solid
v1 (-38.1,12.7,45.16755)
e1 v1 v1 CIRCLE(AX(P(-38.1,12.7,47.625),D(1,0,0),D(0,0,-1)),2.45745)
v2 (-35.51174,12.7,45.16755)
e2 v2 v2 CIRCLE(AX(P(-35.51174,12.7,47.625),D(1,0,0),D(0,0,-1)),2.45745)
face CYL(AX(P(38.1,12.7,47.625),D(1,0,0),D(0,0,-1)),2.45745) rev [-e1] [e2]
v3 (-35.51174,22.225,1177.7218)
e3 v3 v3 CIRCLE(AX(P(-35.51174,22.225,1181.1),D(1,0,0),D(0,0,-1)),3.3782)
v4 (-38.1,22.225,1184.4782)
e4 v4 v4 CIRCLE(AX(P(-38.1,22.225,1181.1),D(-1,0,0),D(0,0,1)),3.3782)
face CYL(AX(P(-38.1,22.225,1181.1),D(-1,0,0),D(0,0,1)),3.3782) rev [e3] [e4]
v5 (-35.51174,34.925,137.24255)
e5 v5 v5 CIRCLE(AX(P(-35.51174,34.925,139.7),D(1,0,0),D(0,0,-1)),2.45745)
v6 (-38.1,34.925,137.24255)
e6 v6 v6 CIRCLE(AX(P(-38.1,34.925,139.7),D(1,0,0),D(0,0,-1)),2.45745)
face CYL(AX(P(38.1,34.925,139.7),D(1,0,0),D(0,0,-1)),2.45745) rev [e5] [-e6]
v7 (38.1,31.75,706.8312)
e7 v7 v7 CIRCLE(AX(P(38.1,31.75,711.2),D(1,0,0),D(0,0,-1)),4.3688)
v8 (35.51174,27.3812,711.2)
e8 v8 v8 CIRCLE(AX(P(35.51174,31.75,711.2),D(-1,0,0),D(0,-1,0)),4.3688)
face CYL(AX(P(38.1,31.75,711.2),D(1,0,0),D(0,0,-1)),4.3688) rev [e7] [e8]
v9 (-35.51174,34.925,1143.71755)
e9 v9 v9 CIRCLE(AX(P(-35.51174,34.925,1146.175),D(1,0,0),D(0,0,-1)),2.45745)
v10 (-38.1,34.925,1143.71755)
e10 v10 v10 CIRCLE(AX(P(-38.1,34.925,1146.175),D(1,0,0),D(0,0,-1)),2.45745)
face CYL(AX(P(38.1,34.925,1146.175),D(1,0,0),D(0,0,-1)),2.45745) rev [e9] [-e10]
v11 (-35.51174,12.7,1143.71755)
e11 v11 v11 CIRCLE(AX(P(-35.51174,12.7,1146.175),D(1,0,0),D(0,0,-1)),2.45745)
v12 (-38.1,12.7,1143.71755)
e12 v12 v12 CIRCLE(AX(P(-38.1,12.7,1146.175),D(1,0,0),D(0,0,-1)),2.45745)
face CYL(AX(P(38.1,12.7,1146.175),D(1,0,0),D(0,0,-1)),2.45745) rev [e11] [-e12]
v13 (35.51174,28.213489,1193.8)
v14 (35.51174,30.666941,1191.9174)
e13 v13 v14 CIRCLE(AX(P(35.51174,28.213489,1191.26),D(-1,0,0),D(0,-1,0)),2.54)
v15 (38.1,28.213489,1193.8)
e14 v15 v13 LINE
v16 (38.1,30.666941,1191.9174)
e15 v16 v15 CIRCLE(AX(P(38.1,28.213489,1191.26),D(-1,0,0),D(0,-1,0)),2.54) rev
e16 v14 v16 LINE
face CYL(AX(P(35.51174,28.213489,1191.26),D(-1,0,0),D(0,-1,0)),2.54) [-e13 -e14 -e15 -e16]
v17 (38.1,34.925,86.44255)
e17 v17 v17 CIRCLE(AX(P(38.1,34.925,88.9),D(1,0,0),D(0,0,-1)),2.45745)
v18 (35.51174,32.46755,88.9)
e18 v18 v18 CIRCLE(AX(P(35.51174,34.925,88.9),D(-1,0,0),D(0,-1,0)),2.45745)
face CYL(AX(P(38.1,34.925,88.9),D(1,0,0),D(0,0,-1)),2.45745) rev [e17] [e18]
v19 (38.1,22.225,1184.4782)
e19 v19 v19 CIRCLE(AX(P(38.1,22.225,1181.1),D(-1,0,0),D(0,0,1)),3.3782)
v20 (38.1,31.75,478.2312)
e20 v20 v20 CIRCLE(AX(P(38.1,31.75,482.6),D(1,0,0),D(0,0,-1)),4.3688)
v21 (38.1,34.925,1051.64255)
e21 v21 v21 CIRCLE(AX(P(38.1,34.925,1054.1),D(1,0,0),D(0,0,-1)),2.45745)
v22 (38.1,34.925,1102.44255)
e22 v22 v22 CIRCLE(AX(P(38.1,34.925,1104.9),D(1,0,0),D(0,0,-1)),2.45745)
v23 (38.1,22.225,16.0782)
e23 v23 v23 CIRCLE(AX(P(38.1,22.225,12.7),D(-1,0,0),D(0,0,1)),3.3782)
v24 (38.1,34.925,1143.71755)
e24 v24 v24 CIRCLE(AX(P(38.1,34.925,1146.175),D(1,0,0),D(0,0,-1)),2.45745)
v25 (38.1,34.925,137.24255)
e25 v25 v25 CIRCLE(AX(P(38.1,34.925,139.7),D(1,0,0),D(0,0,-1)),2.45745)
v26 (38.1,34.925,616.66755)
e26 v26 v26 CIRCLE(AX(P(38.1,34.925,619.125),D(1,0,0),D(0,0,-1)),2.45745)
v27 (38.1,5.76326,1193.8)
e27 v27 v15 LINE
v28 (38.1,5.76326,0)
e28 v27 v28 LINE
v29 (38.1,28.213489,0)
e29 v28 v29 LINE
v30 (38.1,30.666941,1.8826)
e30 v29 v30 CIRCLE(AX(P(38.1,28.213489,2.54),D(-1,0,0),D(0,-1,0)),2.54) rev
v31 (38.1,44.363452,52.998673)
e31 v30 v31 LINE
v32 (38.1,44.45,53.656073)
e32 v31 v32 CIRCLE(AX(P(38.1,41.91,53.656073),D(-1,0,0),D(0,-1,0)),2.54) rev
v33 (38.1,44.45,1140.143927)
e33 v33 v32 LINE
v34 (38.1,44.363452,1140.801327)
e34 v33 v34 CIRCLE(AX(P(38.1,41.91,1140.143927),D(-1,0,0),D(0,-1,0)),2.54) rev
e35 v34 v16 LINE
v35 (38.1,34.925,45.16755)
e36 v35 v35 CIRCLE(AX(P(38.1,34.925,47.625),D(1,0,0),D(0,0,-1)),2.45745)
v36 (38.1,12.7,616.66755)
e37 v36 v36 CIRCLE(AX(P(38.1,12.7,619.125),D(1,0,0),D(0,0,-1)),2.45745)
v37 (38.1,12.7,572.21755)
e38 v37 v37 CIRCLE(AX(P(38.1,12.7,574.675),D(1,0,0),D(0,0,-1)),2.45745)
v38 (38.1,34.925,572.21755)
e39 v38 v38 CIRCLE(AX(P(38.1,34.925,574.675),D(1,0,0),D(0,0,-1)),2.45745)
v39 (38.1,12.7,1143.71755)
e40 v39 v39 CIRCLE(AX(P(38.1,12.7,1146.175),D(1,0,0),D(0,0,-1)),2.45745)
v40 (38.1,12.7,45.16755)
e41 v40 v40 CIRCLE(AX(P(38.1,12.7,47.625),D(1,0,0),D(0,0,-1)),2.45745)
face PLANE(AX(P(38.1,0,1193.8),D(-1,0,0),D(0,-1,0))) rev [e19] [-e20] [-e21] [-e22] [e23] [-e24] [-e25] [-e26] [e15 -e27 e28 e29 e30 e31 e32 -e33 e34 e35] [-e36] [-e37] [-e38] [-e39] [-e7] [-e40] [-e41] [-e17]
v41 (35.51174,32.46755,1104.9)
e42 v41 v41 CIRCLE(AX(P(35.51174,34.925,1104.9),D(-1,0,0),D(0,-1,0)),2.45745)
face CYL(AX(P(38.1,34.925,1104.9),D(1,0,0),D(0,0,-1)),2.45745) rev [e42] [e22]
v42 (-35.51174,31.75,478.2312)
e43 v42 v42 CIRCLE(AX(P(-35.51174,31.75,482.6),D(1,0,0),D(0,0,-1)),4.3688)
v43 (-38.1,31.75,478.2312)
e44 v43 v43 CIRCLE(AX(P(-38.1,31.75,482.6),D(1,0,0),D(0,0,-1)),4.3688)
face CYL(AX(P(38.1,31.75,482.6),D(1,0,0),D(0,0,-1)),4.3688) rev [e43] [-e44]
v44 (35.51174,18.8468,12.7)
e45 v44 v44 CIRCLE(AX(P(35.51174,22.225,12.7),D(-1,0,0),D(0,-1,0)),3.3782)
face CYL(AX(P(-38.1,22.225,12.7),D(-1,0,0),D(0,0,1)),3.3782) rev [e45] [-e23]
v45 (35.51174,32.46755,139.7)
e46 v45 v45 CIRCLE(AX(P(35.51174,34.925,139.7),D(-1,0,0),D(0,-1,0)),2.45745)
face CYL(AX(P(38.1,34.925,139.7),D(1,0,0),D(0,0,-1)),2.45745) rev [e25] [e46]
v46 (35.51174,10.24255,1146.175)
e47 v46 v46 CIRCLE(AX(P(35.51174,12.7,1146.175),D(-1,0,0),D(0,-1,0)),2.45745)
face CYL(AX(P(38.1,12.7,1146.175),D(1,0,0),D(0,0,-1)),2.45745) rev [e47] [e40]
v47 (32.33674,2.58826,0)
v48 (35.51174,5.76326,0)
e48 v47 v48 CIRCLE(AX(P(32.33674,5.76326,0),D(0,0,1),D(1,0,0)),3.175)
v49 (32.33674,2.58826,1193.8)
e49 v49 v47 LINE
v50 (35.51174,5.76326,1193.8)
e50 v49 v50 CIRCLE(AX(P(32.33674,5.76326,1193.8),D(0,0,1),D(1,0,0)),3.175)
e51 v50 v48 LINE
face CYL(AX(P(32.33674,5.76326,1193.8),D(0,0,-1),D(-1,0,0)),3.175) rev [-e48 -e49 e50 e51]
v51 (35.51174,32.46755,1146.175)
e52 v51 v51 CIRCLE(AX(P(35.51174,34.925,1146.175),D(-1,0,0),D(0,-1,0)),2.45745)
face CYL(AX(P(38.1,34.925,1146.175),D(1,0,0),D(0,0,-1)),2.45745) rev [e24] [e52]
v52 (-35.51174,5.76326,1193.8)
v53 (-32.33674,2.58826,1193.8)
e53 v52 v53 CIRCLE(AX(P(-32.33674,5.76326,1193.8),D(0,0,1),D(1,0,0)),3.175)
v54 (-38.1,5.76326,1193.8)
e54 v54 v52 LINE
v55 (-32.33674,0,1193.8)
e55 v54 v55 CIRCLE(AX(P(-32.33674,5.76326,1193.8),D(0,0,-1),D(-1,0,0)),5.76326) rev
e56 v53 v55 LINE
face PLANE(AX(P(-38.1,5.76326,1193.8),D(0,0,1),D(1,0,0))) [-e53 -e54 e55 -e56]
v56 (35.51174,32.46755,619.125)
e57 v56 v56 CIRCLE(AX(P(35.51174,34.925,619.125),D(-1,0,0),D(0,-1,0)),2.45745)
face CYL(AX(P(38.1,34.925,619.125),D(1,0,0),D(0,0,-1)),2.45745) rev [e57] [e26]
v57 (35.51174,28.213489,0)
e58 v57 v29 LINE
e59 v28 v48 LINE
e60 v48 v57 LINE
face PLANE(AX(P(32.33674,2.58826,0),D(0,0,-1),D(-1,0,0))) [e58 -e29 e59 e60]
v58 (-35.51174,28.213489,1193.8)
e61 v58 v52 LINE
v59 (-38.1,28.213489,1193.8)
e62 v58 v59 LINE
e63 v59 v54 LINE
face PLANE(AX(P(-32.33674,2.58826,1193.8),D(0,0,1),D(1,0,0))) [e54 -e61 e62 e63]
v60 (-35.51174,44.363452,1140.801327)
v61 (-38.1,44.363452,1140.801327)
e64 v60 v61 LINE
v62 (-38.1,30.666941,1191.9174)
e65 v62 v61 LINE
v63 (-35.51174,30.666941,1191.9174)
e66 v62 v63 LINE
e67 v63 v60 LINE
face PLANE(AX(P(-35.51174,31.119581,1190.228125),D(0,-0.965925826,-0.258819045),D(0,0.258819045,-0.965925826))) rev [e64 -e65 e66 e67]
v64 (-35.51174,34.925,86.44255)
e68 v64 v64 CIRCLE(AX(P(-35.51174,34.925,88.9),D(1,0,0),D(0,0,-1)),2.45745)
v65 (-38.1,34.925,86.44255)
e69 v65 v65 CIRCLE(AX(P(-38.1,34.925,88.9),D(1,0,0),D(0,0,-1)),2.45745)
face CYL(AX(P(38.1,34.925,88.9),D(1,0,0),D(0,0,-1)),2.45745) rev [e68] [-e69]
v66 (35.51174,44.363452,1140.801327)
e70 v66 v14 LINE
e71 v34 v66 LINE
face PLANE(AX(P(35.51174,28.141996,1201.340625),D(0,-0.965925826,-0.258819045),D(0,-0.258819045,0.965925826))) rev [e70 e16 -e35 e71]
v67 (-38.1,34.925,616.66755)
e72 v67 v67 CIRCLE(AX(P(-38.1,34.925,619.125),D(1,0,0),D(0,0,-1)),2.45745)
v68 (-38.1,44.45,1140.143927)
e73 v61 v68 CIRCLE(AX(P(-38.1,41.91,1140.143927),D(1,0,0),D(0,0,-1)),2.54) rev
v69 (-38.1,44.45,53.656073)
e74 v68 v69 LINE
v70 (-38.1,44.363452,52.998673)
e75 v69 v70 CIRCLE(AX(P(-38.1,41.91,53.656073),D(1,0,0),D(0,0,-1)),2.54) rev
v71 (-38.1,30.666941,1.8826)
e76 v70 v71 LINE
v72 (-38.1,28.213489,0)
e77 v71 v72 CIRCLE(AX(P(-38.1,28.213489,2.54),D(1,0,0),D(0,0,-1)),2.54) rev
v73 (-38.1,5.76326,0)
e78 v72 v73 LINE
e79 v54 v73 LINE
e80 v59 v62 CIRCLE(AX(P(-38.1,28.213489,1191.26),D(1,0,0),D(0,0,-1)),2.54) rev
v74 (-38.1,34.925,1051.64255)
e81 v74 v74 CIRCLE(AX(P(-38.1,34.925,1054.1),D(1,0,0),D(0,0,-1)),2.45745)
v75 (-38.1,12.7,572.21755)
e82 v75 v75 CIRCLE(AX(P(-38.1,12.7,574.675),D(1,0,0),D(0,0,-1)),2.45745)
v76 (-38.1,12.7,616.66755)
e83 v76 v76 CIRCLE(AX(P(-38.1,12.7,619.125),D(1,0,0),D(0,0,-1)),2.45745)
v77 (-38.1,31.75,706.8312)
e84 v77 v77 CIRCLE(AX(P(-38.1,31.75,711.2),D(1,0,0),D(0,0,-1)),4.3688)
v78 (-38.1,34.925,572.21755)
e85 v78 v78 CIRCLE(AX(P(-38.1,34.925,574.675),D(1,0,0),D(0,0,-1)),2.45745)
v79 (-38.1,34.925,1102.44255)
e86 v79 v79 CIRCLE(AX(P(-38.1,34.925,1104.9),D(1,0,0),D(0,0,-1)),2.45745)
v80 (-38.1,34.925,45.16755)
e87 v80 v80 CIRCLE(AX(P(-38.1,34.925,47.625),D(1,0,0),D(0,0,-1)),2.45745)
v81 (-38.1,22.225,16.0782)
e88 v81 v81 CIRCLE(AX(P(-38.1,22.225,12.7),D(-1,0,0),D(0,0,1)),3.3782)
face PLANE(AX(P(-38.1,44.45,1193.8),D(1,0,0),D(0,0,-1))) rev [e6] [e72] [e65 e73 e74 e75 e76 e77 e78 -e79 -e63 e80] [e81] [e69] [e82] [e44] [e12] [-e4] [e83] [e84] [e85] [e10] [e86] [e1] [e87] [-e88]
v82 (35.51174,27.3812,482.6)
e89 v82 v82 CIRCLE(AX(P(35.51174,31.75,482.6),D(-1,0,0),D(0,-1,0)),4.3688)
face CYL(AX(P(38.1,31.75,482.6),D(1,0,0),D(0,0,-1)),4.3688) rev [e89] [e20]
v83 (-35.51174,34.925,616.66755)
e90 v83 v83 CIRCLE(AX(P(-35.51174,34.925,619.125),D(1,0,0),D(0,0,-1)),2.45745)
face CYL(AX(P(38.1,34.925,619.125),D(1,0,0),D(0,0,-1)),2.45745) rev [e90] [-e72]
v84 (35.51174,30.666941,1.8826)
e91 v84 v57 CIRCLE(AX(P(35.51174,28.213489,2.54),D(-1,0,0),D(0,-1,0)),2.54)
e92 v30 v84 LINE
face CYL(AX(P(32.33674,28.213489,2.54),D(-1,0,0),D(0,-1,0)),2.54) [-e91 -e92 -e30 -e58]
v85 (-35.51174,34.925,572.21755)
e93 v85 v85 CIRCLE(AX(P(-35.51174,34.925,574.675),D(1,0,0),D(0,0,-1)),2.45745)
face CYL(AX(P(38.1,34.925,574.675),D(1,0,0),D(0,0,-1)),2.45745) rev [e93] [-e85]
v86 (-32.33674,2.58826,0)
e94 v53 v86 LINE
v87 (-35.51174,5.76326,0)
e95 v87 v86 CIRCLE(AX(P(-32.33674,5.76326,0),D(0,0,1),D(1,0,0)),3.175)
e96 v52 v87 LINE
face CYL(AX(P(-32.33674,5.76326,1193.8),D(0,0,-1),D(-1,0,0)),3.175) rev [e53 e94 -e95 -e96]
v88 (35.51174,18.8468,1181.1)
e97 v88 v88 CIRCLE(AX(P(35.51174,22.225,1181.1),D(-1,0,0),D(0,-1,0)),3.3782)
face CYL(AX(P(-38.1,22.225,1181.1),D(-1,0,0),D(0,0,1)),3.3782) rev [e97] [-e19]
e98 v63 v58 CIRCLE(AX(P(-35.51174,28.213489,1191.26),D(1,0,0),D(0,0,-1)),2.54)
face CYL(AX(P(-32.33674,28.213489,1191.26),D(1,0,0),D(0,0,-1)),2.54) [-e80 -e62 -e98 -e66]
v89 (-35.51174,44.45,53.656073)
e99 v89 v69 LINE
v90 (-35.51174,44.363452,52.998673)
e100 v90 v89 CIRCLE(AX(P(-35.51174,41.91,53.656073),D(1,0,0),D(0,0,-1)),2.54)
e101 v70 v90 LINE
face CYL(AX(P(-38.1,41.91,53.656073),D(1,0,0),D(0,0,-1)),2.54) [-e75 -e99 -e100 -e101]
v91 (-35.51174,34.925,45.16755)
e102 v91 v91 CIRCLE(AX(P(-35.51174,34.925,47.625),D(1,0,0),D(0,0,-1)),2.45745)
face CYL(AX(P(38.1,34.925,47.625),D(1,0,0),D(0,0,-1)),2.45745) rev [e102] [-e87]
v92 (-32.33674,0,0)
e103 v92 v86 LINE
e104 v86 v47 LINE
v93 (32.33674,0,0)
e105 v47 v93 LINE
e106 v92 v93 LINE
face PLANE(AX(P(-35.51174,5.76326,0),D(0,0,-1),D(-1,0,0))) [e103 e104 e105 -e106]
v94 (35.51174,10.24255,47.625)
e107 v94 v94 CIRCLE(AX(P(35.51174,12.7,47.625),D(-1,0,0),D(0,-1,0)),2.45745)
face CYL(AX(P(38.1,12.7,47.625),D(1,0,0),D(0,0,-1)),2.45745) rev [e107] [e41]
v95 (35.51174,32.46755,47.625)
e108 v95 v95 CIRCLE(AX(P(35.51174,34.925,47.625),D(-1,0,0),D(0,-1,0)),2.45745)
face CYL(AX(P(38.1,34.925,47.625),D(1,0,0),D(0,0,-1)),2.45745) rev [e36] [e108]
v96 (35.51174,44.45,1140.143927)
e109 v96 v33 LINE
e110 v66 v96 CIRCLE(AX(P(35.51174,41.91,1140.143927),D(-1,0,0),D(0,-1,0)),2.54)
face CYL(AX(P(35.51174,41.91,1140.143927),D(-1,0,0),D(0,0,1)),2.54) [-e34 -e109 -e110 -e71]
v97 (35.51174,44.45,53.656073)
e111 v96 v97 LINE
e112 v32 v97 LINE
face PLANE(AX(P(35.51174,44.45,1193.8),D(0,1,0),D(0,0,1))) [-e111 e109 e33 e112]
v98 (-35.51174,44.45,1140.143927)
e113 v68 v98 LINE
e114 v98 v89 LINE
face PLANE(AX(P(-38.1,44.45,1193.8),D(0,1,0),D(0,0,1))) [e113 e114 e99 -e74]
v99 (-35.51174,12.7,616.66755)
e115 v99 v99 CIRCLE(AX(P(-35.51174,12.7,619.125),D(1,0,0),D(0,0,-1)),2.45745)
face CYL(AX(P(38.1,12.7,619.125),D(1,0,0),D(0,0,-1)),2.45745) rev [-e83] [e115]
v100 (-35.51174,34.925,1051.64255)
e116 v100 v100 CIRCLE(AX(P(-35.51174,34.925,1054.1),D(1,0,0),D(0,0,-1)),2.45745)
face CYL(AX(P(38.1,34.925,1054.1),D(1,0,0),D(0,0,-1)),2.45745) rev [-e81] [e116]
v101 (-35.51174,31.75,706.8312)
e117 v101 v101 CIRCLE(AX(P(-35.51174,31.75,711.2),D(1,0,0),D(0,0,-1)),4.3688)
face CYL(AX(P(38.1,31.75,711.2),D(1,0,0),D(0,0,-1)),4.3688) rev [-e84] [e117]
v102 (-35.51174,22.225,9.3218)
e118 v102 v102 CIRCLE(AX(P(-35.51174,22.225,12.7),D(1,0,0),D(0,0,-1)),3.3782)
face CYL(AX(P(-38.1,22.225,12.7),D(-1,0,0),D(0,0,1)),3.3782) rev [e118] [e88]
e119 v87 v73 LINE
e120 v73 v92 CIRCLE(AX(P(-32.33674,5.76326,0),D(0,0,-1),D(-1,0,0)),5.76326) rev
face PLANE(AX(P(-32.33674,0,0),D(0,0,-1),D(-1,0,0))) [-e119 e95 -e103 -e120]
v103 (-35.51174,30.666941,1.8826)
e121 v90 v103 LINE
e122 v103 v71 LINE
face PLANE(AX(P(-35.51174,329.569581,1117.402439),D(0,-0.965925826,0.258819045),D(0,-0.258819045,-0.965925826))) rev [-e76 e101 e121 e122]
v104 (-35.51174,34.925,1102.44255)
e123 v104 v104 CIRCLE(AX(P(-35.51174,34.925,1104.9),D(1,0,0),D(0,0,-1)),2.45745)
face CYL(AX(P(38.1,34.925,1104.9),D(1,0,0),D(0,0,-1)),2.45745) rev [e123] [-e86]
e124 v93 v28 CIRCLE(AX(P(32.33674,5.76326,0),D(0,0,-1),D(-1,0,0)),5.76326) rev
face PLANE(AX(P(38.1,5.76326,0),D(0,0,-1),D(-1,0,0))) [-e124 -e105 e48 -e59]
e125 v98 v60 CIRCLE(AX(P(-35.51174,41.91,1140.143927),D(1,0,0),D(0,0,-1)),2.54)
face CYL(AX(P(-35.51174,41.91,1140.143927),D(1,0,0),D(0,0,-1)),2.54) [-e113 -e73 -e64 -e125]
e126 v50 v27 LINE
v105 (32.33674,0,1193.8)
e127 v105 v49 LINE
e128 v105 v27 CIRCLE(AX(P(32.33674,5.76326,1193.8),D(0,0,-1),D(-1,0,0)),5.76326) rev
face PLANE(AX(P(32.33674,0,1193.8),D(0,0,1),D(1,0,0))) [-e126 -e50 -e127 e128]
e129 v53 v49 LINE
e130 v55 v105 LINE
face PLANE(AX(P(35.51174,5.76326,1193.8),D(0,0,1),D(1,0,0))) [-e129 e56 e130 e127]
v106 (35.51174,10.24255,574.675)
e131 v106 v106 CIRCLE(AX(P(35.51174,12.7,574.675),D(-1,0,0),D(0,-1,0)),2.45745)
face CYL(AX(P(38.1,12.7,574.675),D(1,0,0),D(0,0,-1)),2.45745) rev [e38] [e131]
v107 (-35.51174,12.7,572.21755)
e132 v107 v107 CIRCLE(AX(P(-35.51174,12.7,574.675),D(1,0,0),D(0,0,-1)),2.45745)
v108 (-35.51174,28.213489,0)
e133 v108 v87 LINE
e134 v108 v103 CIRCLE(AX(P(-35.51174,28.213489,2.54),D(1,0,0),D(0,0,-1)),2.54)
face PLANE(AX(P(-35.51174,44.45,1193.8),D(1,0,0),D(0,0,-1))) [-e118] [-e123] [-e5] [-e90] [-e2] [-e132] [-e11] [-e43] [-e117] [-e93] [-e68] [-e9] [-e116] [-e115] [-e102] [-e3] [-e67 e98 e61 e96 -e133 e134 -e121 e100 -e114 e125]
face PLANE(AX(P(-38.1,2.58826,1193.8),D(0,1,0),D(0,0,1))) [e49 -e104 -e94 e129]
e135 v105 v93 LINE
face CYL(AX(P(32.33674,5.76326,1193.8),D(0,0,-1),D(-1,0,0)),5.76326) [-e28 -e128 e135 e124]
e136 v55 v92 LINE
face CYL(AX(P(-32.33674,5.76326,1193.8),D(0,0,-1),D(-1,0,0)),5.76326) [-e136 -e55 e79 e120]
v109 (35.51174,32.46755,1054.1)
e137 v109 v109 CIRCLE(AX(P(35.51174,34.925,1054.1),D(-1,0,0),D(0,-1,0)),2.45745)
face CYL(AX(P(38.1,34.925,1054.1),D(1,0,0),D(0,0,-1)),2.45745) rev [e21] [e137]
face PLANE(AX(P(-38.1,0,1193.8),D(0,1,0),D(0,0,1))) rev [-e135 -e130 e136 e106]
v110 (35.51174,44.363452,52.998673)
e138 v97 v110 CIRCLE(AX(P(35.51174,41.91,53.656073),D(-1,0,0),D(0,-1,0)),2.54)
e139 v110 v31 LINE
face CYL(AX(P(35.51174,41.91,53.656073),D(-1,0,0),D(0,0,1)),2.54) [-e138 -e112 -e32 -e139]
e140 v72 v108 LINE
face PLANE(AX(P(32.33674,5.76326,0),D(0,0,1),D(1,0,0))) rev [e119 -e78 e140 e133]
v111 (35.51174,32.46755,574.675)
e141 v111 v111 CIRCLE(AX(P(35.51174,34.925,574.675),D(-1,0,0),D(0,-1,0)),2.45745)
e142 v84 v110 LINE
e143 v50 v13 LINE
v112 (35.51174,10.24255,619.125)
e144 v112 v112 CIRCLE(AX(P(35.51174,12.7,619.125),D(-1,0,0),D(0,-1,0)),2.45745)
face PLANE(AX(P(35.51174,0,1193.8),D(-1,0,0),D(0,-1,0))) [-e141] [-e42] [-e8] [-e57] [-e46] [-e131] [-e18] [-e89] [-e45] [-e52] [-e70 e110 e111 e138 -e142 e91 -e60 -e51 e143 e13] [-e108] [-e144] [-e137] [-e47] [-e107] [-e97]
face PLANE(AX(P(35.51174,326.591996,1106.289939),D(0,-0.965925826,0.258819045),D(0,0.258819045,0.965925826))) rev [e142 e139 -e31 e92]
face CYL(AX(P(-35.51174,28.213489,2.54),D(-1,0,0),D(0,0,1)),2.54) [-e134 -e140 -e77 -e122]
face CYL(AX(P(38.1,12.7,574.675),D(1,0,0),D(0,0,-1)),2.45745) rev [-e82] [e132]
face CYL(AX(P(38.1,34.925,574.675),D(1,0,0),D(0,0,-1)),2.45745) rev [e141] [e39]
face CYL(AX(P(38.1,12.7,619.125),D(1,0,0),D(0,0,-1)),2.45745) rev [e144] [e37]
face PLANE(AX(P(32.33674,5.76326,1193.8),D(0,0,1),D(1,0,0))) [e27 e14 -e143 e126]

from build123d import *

# Parameters (mm, degrees)
BASE_FLANGE1_DEPTH                        = 1193.8
CUT_EXTRUDE1_DEPTH                        = 1198.055003958
F_1_4_CLEARANCE_HOLE1_D                   = 6.7564
F_10_0_1935_DIAMETER_HOLE1_D              = 4.9149
HOLE_FOR_1_4_SELF_CLINCHING_NUTS_S_SS_C_D = 8.7376
FILLET1_R                                 = 2.54


# Sheet-metal steps are written as plain solids
with BuildPart() as part:
    # Sketch1 → Base-Flange1 (new body)
    with BuildSketch(Plane.XY):
        with BuildLine():
            Line((-38.1, 44.45), (-38.1, 5.76326))
            ThreePointArc((-38.1, 5.76326), (-36.411980228, 1.688019772), (-32.33674, 0))
            Line((-32.33674, 0), (32.33674, 0))
            ThreePointArc((32.33674, 0), (36.411980228, 1.688019772), (38.1, 5.76326))
            Line((38.1, 5.76326), (38.1, 44.45))
            Line((38.1, 44.45), (35.51174, 44.45))
            Line((35.51174, 44.45), (35.51174, 5.76326))
            ThreePointArc((35.51174, 5.76326), (34.58180403, 3.51819597), (32.33674, 2.58826))
            Line((32.33674, 2.58826), (-32.33674, 2.58826))
            ThreePointArc((-32.33674, 2.58826), (-34.58180403, 3.51819597), (-35.51174, 5.76326))
            Line((-35.51174, 5.76326), (-35.51174, 44.45))
            Line((-35.51174, 44.45), (-38.1, 44.45))
        make_face()
    extrude(amount=BASE_FLANGE1_DEPTH)

    # Sketch6 → Cut-Extrude1 (cut, through all)
    with BuildSketch(Plane(origin=(38.1, 0, 0), x_dir=(0, 0, -1), z_dir=(1, 0, 0))):
        Polygon((-1140.478324087, 44.45), (-1193.8, 30.1625), (-1193.8, 44.45), align=None)
        Polygon((0, 44.45), (-53.321675913, 44.45), (0, 30.1625), align=None)
    extrude(amount=-CUT_EXTRUDE1_DEPTH, mode=Mode.SUBTRACT)

    # 1/4 Clearance Hole1 (through all)
    with Locations(Plane.ZY.offset(38.1)):
        with Locations((1181.1, 22.225), (12.7, 22.225)):
            Hole(F_1_4_CLEARANCE_HOLE1_D / 2)

    # #10 (0.1935) Diameter Hole1 (through all)
    with Locations(Plane(origin=(38.1, 0, 0), x_dir=(0, 0, -1), z_dir=(1, 0, 0))):
        with Locations((-619.125, 34.925), (-619.125, 12.7), (-574.675, 12.7), (-574.675, 34.925), (-1146.175, 12.7), (-1104.9, 34.925), (-1054.1, 34.925), (-1146.175, 34.925), (-47.625, 34.925), (-139.7, 34.925), (-88.9, 34.925), (-47.625, 12.7)):
            Hole(F_10_0_1935_DIAMETER_HOLE1_D / 2)

    # Hole for 1/4 Self-clinching Nuts (S,SS,CLS,CLSS)1 (through all)
    with Locations(Plane(origin=(38.1, 0, 0), x_dir=(0, 0, -1), z_dir=(1, 0, 0))):
        with Locations((-711.2, 31.75), (-482.6, 31.75)):
            Hole(HOLE_FOR_1_4_SELF_CLINCHING_NUTS_S_SS_C_D / 2)

    # Fillet1
    fillet1_edges = [part.edges().sort_by_distance(p)[0] for p in [
        (36.80587, 30.1625, 1193.8),
        (36.80587, 44.45, 1140.478324087),
        (-36.80587, 30.1625, 0),
        (-36.80587, 44.45, 53.321675913),
        (36.80587, 44.45, 53.321675913),
        (36.80587, 30.1625, 0),
        (-36.80587, 44.45, 1140.478324087),
        (-36.80587, 30.1625, 1193.8),
    ]]
    fillet(fillet1_edges, radius=FILLET1_R)


solid = part.part
